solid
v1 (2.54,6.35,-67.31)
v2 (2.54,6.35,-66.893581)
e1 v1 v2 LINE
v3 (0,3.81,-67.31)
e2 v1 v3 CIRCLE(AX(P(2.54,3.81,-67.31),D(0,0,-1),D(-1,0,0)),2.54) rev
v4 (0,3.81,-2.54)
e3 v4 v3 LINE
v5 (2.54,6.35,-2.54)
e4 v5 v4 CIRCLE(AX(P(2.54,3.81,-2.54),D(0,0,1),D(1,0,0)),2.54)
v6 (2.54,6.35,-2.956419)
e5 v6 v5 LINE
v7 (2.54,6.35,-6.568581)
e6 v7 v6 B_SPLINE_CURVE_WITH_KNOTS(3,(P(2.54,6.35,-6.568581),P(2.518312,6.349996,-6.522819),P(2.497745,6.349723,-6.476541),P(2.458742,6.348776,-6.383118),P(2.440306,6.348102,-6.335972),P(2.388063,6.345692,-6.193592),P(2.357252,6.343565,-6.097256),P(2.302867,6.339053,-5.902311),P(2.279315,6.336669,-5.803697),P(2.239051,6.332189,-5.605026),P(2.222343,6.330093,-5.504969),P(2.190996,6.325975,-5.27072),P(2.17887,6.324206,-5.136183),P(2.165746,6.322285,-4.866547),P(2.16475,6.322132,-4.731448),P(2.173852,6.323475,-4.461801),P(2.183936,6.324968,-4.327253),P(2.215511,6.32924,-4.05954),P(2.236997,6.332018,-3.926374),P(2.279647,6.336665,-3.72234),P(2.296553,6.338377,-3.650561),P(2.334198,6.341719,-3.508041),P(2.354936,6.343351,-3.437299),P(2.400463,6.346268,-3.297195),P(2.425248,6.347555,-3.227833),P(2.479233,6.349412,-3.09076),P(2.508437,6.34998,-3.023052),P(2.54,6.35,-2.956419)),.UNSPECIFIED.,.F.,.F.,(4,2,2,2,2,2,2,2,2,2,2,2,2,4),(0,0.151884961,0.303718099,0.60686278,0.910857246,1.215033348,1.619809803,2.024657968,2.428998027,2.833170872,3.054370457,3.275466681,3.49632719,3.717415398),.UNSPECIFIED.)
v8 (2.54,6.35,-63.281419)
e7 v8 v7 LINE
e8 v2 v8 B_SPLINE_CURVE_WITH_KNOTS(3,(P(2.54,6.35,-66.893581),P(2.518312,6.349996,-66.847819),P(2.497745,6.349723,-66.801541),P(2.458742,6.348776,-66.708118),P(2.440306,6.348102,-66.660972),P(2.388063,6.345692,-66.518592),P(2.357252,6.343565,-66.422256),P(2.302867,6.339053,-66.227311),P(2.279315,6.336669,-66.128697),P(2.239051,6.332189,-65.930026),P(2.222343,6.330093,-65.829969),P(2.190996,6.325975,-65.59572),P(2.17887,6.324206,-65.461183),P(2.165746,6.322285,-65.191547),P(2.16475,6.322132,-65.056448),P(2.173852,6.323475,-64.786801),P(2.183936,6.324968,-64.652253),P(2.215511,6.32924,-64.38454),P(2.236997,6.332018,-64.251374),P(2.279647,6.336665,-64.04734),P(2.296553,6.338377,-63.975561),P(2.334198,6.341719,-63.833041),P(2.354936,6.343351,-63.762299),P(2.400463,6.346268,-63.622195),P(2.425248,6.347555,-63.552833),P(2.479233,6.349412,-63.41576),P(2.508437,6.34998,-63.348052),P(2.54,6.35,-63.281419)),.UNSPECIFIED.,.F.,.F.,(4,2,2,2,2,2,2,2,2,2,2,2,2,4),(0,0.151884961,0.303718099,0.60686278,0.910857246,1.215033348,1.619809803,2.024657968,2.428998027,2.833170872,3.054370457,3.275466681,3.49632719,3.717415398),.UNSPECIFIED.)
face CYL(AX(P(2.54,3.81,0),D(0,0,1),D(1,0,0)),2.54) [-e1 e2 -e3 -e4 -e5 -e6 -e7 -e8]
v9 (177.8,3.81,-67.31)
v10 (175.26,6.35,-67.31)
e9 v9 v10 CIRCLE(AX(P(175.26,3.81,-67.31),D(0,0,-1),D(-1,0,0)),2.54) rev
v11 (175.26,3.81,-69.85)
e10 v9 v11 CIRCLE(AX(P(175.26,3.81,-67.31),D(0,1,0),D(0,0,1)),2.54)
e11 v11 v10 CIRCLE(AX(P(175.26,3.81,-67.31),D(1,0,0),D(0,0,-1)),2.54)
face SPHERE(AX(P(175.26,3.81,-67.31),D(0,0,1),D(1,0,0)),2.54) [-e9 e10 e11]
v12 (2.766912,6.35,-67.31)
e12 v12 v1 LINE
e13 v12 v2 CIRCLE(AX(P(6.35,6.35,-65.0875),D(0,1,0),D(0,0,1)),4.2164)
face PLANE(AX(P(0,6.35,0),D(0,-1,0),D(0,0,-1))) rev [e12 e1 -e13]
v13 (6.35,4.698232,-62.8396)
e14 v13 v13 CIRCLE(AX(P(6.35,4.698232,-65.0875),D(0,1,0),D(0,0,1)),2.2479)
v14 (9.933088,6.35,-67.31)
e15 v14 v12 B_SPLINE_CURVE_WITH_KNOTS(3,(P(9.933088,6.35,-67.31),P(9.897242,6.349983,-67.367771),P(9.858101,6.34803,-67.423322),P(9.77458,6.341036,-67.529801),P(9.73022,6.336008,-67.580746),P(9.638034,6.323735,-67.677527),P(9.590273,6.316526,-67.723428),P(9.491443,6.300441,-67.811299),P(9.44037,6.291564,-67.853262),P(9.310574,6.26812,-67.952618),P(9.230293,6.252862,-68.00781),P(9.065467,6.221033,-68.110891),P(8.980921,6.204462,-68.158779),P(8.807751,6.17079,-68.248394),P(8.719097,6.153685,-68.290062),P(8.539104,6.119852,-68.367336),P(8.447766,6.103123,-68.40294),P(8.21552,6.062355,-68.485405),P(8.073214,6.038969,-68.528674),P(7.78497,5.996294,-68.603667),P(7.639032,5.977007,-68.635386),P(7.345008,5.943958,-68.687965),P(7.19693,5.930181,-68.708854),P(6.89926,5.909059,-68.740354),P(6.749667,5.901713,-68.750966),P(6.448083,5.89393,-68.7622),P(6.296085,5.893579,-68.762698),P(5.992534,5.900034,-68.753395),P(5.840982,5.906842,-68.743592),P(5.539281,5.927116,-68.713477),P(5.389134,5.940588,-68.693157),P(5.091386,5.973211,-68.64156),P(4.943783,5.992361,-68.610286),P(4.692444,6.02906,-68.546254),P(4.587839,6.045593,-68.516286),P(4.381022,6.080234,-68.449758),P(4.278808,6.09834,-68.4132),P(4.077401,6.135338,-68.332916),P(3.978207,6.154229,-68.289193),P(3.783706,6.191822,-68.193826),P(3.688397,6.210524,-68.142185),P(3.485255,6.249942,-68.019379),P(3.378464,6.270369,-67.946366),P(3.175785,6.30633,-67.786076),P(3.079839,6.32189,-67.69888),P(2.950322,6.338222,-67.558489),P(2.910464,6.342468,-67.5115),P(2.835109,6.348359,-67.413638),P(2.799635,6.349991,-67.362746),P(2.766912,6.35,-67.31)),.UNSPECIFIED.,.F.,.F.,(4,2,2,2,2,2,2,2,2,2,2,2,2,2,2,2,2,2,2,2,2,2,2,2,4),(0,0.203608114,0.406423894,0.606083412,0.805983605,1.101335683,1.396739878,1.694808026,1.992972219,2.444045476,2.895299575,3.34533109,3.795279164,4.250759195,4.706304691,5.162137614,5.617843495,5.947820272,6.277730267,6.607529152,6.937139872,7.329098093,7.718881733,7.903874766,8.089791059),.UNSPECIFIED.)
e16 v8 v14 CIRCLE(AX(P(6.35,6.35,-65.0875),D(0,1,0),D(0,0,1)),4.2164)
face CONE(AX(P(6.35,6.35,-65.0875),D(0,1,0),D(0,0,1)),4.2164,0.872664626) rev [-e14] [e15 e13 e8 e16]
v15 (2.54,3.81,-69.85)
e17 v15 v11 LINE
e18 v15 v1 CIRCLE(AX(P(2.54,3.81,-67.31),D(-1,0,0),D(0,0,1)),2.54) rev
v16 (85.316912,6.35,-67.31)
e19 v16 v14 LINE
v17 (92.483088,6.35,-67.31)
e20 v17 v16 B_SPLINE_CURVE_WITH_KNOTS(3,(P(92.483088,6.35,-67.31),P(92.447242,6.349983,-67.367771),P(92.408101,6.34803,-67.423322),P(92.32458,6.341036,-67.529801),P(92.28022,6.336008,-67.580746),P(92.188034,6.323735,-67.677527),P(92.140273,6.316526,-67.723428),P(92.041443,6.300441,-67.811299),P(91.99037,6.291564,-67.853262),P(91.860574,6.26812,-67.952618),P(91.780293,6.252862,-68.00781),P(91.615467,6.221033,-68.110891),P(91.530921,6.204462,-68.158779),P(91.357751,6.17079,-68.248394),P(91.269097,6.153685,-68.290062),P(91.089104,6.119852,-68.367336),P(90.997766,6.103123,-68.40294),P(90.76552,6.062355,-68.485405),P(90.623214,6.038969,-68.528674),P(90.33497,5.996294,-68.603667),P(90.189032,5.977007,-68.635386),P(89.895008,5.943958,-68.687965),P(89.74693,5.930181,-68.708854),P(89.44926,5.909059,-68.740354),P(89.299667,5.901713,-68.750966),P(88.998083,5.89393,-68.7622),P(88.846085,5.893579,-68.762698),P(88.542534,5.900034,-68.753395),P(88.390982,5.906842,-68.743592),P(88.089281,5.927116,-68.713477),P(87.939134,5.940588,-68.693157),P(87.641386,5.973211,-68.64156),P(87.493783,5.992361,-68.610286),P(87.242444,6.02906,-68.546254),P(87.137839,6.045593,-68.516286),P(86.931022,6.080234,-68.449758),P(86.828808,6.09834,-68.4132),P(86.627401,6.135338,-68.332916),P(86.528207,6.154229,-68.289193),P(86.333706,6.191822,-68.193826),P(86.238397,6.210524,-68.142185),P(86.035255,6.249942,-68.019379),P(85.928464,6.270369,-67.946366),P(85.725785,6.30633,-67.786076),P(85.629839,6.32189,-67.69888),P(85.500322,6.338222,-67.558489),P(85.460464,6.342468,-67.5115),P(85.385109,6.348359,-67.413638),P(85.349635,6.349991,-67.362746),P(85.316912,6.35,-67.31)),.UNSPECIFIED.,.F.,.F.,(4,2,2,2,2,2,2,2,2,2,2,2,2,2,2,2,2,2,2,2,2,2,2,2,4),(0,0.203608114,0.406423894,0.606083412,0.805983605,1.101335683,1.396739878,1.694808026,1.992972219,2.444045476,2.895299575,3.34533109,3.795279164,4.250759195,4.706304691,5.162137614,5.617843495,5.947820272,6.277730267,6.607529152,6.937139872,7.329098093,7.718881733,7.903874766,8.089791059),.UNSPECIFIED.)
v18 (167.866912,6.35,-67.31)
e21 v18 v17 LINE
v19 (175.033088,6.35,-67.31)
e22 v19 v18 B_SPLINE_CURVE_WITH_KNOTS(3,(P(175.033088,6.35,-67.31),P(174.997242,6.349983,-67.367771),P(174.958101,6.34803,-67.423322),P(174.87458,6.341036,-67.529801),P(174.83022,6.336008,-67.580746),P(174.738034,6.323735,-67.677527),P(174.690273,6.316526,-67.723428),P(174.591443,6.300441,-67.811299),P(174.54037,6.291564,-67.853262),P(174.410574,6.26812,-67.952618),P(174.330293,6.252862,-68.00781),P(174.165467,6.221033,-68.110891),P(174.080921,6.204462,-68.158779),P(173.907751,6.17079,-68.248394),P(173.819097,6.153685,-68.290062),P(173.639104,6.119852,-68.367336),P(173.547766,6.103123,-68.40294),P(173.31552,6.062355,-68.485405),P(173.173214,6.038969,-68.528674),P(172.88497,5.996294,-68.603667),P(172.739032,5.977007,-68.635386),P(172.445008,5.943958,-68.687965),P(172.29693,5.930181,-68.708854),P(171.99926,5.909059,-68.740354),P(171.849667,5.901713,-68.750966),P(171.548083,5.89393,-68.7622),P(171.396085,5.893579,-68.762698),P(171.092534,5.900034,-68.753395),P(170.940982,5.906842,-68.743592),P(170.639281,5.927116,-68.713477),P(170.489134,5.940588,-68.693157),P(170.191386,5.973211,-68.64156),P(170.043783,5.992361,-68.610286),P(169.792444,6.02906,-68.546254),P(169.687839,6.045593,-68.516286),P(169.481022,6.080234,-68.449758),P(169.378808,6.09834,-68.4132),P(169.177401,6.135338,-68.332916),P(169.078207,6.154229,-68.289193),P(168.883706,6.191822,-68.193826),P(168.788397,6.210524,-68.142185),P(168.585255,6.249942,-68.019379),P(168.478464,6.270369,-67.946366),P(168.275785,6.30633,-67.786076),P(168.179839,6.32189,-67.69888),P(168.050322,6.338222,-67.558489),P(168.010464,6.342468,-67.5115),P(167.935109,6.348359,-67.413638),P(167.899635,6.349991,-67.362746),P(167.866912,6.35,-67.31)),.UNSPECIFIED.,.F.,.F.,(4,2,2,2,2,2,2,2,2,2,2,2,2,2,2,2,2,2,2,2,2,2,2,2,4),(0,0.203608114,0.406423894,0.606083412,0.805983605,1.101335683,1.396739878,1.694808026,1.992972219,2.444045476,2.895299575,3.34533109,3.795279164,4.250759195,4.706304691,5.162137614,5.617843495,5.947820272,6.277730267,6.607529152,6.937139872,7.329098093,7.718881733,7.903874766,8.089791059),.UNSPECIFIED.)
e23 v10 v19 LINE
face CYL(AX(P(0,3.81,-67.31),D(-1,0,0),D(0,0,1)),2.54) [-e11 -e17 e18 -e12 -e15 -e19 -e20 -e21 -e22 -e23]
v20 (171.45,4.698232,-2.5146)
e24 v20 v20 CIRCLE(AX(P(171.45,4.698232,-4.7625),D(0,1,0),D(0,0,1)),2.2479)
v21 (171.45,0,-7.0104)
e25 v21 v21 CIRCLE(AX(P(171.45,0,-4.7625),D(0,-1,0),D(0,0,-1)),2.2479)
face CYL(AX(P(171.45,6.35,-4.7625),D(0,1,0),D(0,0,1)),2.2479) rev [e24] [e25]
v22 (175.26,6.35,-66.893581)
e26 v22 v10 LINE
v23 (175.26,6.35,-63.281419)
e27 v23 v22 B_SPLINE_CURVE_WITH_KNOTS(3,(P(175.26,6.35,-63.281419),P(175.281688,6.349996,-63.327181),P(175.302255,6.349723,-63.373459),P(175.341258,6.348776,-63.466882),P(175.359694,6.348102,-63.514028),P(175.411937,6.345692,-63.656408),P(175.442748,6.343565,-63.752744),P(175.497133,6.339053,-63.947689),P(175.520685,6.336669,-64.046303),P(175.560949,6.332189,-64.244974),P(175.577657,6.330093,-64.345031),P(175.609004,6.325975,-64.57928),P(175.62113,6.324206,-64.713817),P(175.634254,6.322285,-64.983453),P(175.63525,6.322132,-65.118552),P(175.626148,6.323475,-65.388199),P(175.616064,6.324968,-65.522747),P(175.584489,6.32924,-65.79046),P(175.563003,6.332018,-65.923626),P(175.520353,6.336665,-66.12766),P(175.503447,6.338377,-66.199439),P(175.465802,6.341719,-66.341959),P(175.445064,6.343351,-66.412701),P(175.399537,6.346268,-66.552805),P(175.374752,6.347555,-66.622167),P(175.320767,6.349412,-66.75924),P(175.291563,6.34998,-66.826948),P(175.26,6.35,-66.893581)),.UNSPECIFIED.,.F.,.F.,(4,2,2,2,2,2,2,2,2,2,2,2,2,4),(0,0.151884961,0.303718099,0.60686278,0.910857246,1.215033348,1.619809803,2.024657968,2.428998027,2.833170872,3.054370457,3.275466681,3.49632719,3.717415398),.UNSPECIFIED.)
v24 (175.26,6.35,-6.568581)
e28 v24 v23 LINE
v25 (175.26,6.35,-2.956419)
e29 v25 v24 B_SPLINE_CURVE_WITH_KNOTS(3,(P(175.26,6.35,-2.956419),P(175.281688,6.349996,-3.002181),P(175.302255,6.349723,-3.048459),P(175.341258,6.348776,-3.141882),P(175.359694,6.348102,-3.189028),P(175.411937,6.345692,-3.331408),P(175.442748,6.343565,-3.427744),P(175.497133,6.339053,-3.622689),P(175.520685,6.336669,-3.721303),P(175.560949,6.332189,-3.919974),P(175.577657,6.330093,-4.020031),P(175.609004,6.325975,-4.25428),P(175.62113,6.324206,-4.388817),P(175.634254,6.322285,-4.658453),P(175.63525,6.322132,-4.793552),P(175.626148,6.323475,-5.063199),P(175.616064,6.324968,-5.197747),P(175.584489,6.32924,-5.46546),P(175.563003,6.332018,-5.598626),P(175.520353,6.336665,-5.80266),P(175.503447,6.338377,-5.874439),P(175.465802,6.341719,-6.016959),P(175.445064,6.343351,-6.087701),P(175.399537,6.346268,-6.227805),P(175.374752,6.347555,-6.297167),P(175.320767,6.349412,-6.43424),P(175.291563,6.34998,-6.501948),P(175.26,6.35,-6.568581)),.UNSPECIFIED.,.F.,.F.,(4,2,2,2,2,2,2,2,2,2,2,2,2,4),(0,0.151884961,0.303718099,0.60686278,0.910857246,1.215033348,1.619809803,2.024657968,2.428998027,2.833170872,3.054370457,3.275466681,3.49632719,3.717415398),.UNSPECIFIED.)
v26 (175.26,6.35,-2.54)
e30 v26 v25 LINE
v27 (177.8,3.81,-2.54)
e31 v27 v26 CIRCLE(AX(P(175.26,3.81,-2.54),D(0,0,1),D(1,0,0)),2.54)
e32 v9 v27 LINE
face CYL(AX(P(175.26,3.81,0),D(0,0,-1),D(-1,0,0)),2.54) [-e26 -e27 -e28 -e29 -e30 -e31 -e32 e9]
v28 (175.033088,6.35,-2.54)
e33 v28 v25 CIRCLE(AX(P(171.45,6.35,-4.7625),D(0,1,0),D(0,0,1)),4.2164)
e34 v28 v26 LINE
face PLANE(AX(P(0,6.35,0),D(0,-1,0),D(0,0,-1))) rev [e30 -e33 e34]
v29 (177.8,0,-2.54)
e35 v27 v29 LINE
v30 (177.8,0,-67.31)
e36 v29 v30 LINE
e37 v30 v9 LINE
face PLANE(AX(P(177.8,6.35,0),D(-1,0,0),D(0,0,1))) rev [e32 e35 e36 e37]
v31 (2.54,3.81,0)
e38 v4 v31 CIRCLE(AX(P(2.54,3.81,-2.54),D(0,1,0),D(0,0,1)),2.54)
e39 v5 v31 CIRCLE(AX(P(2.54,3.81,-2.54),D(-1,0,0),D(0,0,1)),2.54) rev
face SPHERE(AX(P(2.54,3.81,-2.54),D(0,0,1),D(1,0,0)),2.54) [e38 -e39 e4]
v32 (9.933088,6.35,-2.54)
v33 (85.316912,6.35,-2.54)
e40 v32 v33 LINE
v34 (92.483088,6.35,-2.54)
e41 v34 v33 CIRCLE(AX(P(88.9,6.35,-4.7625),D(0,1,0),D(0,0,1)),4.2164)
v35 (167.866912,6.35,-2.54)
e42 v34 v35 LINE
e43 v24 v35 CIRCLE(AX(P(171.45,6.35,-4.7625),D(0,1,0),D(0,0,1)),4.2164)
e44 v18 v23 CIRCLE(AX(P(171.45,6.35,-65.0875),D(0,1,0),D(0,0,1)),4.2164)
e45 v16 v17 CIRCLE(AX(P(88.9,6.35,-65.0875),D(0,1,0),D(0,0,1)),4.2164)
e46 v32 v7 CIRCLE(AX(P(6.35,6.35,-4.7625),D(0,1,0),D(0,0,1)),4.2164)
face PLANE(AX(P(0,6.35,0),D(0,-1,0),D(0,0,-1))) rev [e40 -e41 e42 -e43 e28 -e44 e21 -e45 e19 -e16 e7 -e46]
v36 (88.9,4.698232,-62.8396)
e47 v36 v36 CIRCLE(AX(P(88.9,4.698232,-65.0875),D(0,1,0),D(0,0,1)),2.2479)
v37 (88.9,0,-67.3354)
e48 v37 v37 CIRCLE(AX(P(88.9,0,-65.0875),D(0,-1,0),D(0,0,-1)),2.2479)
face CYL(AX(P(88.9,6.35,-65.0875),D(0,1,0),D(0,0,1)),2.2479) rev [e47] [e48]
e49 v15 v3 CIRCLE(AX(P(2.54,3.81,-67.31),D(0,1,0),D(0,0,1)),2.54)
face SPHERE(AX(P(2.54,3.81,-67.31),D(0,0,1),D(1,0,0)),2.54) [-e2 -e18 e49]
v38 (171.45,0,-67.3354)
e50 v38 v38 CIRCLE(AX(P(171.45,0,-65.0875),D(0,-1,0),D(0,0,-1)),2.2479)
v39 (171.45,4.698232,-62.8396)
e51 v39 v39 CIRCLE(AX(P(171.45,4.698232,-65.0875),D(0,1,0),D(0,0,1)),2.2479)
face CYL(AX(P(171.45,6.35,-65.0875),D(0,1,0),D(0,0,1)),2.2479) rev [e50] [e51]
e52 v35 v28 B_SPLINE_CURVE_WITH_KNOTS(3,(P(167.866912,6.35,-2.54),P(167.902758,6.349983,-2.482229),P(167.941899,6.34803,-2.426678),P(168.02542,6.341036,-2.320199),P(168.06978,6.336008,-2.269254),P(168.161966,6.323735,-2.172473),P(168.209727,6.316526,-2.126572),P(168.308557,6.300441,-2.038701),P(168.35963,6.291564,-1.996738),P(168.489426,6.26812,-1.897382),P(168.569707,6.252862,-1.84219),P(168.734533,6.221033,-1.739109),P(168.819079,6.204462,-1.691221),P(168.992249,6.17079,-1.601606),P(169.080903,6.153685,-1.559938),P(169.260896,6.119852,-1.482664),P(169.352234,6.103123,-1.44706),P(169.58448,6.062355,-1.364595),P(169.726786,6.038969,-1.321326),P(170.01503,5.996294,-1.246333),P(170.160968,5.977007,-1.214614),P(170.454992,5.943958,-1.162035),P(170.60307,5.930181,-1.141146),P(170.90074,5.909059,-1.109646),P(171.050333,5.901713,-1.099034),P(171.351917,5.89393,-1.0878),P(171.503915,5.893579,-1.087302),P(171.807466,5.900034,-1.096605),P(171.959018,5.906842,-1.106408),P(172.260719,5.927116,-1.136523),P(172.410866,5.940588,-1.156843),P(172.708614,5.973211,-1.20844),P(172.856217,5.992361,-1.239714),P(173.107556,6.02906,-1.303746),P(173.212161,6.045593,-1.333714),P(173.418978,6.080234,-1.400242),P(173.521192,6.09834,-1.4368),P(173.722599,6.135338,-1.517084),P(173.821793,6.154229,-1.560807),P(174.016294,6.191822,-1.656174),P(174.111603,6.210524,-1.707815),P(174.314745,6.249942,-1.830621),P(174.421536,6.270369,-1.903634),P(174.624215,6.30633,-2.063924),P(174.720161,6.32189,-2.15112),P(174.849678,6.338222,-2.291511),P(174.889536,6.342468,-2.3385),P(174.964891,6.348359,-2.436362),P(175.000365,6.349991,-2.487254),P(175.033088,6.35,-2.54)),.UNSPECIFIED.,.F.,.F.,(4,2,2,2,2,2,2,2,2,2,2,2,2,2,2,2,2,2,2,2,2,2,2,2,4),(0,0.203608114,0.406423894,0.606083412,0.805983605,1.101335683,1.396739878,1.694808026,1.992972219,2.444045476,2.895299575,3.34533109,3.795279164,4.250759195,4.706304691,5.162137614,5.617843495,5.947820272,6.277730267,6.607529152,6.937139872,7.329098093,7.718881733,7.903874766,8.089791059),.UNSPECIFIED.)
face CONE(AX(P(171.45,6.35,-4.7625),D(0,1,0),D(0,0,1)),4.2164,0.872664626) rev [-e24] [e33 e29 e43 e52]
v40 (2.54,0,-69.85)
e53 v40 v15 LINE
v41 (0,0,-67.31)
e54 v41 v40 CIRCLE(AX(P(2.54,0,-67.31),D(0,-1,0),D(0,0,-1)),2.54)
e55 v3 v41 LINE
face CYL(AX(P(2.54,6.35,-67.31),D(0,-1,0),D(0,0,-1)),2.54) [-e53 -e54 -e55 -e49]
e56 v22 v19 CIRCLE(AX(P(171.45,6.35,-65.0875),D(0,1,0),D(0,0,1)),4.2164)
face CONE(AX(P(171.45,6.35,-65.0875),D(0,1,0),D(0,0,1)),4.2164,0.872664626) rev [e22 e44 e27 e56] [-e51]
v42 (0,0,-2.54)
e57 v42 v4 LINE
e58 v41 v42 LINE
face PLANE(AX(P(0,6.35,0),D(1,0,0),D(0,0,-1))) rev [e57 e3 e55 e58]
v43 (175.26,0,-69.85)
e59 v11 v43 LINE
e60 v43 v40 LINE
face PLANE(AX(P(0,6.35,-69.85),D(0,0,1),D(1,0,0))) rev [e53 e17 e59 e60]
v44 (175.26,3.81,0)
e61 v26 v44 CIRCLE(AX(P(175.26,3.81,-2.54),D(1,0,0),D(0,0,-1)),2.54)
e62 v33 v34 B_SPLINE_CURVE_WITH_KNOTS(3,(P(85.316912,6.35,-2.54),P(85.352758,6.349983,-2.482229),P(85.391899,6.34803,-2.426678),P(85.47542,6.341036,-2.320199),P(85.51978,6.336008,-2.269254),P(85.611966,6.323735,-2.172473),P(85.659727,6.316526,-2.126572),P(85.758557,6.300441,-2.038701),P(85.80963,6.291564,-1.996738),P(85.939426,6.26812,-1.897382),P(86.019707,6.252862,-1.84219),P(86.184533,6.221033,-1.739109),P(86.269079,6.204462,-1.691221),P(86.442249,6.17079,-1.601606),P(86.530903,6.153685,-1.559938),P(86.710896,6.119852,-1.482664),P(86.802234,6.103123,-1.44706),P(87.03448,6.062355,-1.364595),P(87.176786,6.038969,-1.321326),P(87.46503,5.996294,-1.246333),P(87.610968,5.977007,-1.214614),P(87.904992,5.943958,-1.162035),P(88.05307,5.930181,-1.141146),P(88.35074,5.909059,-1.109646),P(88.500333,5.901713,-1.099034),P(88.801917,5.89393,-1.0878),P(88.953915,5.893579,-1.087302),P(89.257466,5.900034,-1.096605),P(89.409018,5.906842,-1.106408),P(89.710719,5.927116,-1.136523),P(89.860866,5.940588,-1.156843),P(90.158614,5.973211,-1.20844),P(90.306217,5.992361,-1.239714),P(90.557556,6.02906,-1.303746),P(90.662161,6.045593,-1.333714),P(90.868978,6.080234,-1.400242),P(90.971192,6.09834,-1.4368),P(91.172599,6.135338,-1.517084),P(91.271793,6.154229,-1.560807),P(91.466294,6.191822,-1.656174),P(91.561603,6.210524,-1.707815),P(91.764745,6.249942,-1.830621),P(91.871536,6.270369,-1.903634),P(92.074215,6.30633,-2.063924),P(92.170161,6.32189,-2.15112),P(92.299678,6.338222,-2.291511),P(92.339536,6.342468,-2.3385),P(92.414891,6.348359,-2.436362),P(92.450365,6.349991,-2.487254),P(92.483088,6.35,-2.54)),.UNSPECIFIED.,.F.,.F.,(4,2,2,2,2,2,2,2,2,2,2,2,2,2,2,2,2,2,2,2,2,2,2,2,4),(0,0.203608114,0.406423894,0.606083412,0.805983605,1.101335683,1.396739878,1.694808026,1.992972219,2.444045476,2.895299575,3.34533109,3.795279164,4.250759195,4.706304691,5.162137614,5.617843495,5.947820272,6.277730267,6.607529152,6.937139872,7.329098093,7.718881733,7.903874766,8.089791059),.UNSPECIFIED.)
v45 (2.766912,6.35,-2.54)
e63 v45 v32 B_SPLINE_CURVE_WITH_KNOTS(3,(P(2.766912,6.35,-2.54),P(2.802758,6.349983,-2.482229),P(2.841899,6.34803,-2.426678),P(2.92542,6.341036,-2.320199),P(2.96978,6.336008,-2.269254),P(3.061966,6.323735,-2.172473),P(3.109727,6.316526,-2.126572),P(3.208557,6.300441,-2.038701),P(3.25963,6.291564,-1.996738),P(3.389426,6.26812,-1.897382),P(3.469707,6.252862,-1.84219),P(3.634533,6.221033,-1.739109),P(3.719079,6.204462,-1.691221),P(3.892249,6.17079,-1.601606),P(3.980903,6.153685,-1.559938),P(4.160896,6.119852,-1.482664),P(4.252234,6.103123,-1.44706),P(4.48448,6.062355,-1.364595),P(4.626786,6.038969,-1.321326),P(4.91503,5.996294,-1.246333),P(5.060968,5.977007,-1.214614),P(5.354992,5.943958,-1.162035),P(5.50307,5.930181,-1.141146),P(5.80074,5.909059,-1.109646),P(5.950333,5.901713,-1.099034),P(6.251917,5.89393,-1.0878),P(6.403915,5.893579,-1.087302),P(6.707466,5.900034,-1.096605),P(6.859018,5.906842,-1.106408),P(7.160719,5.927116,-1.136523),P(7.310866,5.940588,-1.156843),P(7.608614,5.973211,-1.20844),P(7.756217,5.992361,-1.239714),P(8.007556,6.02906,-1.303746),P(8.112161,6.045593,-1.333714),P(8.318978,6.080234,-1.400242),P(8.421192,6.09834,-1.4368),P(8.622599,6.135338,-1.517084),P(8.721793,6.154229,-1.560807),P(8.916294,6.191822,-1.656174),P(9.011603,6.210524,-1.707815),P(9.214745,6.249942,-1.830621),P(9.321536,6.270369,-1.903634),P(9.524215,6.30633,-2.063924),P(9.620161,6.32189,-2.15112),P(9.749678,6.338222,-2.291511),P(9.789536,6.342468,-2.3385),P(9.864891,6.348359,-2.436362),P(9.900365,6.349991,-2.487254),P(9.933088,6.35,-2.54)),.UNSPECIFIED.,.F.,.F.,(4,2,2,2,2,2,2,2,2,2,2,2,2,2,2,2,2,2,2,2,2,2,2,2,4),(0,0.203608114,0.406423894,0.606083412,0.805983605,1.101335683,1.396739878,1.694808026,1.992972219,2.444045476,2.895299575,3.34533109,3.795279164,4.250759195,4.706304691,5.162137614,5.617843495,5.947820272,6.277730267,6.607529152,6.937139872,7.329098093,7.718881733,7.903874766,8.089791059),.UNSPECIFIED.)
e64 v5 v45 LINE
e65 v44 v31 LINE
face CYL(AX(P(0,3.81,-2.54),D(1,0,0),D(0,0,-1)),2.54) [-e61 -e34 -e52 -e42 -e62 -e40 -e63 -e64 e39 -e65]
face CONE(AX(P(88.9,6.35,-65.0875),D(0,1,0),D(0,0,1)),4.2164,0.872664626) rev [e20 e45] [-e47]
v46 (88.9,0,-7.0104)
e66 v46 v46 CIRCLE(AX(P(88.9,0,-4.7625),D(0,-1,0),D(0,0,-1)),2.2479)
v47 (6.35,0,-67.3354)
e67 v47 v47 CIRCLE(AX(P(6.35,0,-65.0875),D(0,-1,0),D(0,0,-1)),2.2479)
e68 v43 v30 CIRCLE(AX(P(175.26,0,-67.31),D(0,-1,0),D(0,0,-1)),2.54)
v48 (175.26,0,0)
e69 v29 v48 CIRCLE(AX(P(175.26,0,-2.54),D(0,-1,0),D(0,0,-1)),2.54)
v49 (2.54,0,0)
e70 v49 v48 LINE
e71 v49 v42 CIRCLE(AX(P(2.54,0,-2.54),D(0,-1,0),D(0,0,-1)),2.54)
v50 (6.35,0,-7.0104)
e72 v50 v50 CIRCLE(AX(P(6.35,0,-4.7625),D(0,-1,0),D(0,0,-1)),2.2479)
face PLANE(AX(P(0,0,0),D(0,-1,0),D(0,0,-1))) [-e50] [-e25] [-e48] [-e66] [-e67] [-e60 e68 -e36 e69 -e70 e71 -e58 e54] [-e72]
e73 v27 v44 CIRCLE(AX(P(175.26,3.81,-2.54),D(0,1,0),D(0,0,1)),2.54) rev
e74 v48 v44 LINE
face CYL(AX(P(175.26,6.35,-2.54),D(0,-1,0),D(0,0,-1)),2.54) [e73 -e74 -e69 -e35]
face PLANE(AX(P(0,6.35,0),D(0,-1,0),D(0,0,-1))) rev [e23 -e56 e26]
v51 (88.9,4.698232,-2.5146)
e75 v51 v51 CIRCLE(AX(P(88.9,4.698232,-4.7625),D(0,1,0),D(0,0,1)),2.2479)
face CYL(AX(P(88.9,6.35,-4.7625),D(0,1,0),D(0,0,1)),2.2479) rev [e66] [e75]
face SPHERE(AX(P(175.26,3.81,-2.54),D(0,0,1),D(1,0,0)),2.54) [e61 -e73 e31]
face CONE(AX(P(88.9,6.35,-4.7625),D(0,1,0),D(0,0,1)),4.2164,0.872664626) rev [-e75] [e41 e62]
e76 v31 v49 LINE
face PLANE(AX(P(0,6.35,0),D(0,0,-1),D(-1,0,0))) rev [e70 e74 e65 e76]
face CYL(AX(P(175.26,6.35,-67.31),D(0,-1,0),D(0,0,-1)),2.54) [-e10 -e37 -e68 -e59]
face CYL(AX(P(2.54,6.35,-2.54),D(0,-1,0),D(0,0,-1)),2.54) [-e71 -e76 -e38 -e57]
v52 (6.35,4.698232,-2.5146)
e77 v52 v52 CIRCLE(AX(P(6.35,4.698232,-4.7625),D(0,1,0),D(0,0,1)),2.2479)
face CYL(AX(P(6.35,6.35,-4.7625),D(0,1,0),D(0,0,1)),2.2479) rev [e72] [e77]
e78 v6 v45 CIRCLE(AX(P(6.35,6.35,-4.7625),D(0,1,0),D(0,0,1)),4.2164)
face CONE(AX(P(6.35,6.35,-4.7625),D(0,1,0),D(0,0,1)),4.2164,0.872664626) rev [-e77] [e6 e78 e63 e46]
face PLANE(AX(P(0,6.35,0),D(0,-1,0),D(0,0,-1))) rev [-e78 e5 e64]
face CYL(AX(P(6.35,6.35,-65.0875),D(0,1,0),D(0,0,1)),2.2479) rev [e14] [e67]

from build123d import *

# Parameters (mm, degrees)
SKETCH1_W                                         = 177.8
SKETCH1_H                                         = 69.85
BOSS_EXTRUDE1_DEPTH                               = 6.35
CSK_FOR_8_FLAT_HEAD_MACHINE_SCREW_100_D           = 4.4958
CSK_FOR_8_FLAT_HEAD_MACHINE_SCREW_100_DEPTH       = 12.7
CSK_FOR_8_FLAT_HEAD_MACHINE_SCREW_100_CSINK_D     = 8.4328
CSK_FOR_8_FLAT_HEAD_MACHINE_SCREW_100_CSINK_ANGLE = 100
CSK_FOR_8_FLAT_HEAD_MACHINE_SCREW_100_TIP         = 1.350674586
FILLET1_R                                         = 2.54


with BuildPart() as part:
    # Sketch1 → Boss-Extrude1 (new body)
    with BuildSketch(Plane(origin=(0, 0, 0), x_dir=(1, 0, 0), z_dir=(0, 1, 0))):
        with Locations((88.9, 34.925)):
            Rectangle(SKETCH1_W, SKETCH1_H)
    extrude(amount=BOSS_EXTRUDE1_DEPTH)

    # CSK for #8 Flat Head Machine Screw (100)1
    with Locations(Plane(origin=(0, 6.35, 0), x_dir=(1, 0, 0), z_dir=(0, 1, 0))):
        with Locations((88.9, 65.0875), (6.35, 65.0875), (171.45, 65.0875), (171.45, 4.7625), (88.9, 4.7625), (6.35, 4.7625)):
            CounterSinkHole(CSK_FOR_8_FLAT_HEAD_MACHINE_SCREW_100_D / 2, CSK_FOR_8_FLAT_HEAD_MACHINE_SCREW_100_CSINK_D / 2, depth=CSK_FOR_8_FLAT_HEAD_MACHINE_SCREW_100_DEPTH, counter_sink_angle=CSK_FOR_8_FLAT_HEAD_MACHINE_SCREW_100_CSINK_ANGLE)
            with Locations((0, 0, -(CSK_FOR_8_FLAT_HEAD_MACHINE_SCREW_100_DEPTH + CSK_FOR_8_FLAT_HEAD_MACHINE_SCREW_100_TIP / 2))):  # 118° drill point
                Cone(0, CSK_FOR_8_FLAT_HEAD_MACHINE_SCREW_100_D / 2, CSK_FOR_8_FLAT_HEAD_MACHINE_SCREW_100_TIP, mode=Mode.SUBTRACT)

    # Fillet1
    # the kernel refuses this fillet: 2.54 mm, written as the material it takes off along each edge
    with BuildSketch(Plane(origin=(175.26, 3.81, -2.54), x_dir=(0, 1, 0), z_dir=(1, 0, 0))) as fillet1_piece_1_section:
        Polygon((0, 0), (FILLET1_R, 0), (FILLET1_R, FILLET1_R), (0, FILLET1_R), align=None)
    fillet1_piece_1 = extrude(amount=FILLET1_R, mode=Mode.PRIVATE)
    fillet1_piece_1 = fillet1_piece_1 - Plane(origin=(175.26, 3.81, -2.54), x_dir=(0, -0.7071067811865475, -0.7071067811865475), z_dir=(1, 0, 0)) * Sphere(FILLET1_R, mode=Mode.PRIVATE)
    add(fillet1_piece_1, mode=Mode.SUBTRACT)
    with BuildSketch(Plane(origin=(175.26, 3.81, -67.31), x_dir=(0, 1, 0), z_dir=(1, 0, 0))) as fillet1_piece_2_section:
        Polygon((0, 0), (FILLET1_R, 0), (FILLET1_R, -FILLET1_R), (0, -FILLET1_R), align=None)
    fillet1_piece_2 = extrude(amount=FILLET1_R, mode=Mode.PRIVATE)
    fillet1_piece_2 = fillet1_piece_2 - Plane(origin=(175.26, 3.81, -67.31), x_dir=(0, -0.7071067811865475, 0.7071067811865475), z_dir=(1, 0, 0)) * Sphere(FILLET1_R, mode=Mode.PRIVATE)
    add(fillet1_piece_2, mode=Mode.SUBTRACT)
    with BuildSketch(Plane(origin=(2.54, 3.81, -67.31), x_dir=(0, 0, -1), z_dir=(0, 1, 0))) as fillet1_piece_3_section:
        Polygon((0, 0), (FILLET1_R, 0), (FILLET1_R, FILLET1_R), (0, FILLET1_R), align=None)
    fillet1_piece_3 = extrude(amount=FILLET1_R, mode=Mode.PRIVATE)
    fillet1_piece_3 = fillet1_piece_3 - Plane(origin=(2.54, 3.81, -67.31), x_dir=(0.7071067811865475, 0, 0.7071067811865475), z_dir=(0, 1, 0)) * Sphere(FILLET1_R, mode=Mode.PRIVATE)
    add(fillet1_piece_3, mode=Mode.SUBTRACT)
    with BuildSketch(Plane(origin=(2.54, 3.81, -2.54), x_dir=(0, 1, 0), z_dir=(0, 0, 1))) as fillet1_piece_4_section:
        Polygon((0, 0), (FILLET1_R, 0), (FILLET1_R, FILLET1_R), (0, FILLET1_R), align=None)
    fillet1_piece_4 = extrude(amount=FILLET1_R, mode=Mode.PRIVATE)
    fillet1_piece_4 = fillet1_piece_4 - Plane(origin=(2.54, 3.81, -2.54), x_dir=(0.7071067811865475, -0.7071067811865475, 0), z_dir=(0, 0, 1)) * Sphere(FILLET1_R, mode=Mode.PRIVATE)
    add(fillet1_piece_4, mode=Mode.SUBTRACT)
    with BuildSketch(Plane(origin=(177.8, 6.35, -2.54), x_dir=(-1, 0, 0), z_dir=(0, 0, -1)), Plane(origin=(0, 6.35, -67.31), x_dir=(1, 0, 0), z_dir=(0, 0, 1))) as fillet1_piece_5:
        with BuildLine():
            CenterArc((FILLET1_R, -FILLET1_R), FILLET1_R, 90, 90)
            Line((0, -FILLET1_R), (0, 0))
            Line((0, 0), (FILLET1_R, 0))
        make_face()
    extrude(amount=64.77, mode=Mode.SUBTRACT)
    with BuildSketch(Plane(origin=(175.26, 6.35, -69.85), x_dir=(0, 0, 1), z_dir=(-1, 0, 0))) as fillet1_piece_6:
        with BuildLine():
            CenterArc((FILLET1_R, -FILLET1_R), FILLET1_R, 90, 90)
            Line((0, -FILLET1_R), (0, 0))
            Line((0, 0), (FILLET1_R, 0))
        make_face()
    extrude(amount=172.72, mode=Mode.SUBTRACT)
    with BuildSketch(Plane(origin=(2.54, 6.35, 0), x_dir=(0, -1, 0), z_dir=(1, 0, 0))) as fillet1_piece_7:
        with BuildLine():
            CenterArc((FILLET1_R, FILLET1_R), FILLET1_R, 180, 90)
            Line((0, FILLET1_R), (0, 0))
            Line((0, 0), (FILLET1_R, 0))
        make_face()
    extrude(amount=172.72, mode=Mode.SUBTRACT)
    with BuildSketch(Plane(origin=(0, -6.35, -69.85), x_dir=(1, 0, 0), z_dir=(0, 1, 0)), Plane(origin=(177.8, -6.35, 0), x_dir=(-1, 0, 0), z_dir=(0, 1, 0))) as fillet1_piece_8:
        with BuildLine():
            CenterArc((FILLET1_R, -FILLET1_R), FILLET1_R, 90, 90)
            Line((0, -FILLET1_R), (0, 0))
            Line((0, 0), (FILLET1_R, 0))
        make_face()
    extrude(amount=10.16, mode=Mode.SUBTRACT)
    with BuildSketch(Plane(origin=(177.8, -6.35, -69.85), x_dir=(-1, 0, 0), z_dir=(0, 1, 0)), Plane(origin=(0, -6.35, 0), x_dir=(1, 0, 0), z_dir=(0, 1, 0))) as fillet1_piece_9:
        with BuildLine():
            CenterArc((FILLET1_R, FILLET1_R), FILLET1_R, 180, 90)
            Line((0, FILLET1_R), (0, 0))
            Line((0, 0), (FILLET1_R, 0))
        make_face()
    extrude(amount=10.16, mode=Mode.SUBTRACT)


solid = part.part
